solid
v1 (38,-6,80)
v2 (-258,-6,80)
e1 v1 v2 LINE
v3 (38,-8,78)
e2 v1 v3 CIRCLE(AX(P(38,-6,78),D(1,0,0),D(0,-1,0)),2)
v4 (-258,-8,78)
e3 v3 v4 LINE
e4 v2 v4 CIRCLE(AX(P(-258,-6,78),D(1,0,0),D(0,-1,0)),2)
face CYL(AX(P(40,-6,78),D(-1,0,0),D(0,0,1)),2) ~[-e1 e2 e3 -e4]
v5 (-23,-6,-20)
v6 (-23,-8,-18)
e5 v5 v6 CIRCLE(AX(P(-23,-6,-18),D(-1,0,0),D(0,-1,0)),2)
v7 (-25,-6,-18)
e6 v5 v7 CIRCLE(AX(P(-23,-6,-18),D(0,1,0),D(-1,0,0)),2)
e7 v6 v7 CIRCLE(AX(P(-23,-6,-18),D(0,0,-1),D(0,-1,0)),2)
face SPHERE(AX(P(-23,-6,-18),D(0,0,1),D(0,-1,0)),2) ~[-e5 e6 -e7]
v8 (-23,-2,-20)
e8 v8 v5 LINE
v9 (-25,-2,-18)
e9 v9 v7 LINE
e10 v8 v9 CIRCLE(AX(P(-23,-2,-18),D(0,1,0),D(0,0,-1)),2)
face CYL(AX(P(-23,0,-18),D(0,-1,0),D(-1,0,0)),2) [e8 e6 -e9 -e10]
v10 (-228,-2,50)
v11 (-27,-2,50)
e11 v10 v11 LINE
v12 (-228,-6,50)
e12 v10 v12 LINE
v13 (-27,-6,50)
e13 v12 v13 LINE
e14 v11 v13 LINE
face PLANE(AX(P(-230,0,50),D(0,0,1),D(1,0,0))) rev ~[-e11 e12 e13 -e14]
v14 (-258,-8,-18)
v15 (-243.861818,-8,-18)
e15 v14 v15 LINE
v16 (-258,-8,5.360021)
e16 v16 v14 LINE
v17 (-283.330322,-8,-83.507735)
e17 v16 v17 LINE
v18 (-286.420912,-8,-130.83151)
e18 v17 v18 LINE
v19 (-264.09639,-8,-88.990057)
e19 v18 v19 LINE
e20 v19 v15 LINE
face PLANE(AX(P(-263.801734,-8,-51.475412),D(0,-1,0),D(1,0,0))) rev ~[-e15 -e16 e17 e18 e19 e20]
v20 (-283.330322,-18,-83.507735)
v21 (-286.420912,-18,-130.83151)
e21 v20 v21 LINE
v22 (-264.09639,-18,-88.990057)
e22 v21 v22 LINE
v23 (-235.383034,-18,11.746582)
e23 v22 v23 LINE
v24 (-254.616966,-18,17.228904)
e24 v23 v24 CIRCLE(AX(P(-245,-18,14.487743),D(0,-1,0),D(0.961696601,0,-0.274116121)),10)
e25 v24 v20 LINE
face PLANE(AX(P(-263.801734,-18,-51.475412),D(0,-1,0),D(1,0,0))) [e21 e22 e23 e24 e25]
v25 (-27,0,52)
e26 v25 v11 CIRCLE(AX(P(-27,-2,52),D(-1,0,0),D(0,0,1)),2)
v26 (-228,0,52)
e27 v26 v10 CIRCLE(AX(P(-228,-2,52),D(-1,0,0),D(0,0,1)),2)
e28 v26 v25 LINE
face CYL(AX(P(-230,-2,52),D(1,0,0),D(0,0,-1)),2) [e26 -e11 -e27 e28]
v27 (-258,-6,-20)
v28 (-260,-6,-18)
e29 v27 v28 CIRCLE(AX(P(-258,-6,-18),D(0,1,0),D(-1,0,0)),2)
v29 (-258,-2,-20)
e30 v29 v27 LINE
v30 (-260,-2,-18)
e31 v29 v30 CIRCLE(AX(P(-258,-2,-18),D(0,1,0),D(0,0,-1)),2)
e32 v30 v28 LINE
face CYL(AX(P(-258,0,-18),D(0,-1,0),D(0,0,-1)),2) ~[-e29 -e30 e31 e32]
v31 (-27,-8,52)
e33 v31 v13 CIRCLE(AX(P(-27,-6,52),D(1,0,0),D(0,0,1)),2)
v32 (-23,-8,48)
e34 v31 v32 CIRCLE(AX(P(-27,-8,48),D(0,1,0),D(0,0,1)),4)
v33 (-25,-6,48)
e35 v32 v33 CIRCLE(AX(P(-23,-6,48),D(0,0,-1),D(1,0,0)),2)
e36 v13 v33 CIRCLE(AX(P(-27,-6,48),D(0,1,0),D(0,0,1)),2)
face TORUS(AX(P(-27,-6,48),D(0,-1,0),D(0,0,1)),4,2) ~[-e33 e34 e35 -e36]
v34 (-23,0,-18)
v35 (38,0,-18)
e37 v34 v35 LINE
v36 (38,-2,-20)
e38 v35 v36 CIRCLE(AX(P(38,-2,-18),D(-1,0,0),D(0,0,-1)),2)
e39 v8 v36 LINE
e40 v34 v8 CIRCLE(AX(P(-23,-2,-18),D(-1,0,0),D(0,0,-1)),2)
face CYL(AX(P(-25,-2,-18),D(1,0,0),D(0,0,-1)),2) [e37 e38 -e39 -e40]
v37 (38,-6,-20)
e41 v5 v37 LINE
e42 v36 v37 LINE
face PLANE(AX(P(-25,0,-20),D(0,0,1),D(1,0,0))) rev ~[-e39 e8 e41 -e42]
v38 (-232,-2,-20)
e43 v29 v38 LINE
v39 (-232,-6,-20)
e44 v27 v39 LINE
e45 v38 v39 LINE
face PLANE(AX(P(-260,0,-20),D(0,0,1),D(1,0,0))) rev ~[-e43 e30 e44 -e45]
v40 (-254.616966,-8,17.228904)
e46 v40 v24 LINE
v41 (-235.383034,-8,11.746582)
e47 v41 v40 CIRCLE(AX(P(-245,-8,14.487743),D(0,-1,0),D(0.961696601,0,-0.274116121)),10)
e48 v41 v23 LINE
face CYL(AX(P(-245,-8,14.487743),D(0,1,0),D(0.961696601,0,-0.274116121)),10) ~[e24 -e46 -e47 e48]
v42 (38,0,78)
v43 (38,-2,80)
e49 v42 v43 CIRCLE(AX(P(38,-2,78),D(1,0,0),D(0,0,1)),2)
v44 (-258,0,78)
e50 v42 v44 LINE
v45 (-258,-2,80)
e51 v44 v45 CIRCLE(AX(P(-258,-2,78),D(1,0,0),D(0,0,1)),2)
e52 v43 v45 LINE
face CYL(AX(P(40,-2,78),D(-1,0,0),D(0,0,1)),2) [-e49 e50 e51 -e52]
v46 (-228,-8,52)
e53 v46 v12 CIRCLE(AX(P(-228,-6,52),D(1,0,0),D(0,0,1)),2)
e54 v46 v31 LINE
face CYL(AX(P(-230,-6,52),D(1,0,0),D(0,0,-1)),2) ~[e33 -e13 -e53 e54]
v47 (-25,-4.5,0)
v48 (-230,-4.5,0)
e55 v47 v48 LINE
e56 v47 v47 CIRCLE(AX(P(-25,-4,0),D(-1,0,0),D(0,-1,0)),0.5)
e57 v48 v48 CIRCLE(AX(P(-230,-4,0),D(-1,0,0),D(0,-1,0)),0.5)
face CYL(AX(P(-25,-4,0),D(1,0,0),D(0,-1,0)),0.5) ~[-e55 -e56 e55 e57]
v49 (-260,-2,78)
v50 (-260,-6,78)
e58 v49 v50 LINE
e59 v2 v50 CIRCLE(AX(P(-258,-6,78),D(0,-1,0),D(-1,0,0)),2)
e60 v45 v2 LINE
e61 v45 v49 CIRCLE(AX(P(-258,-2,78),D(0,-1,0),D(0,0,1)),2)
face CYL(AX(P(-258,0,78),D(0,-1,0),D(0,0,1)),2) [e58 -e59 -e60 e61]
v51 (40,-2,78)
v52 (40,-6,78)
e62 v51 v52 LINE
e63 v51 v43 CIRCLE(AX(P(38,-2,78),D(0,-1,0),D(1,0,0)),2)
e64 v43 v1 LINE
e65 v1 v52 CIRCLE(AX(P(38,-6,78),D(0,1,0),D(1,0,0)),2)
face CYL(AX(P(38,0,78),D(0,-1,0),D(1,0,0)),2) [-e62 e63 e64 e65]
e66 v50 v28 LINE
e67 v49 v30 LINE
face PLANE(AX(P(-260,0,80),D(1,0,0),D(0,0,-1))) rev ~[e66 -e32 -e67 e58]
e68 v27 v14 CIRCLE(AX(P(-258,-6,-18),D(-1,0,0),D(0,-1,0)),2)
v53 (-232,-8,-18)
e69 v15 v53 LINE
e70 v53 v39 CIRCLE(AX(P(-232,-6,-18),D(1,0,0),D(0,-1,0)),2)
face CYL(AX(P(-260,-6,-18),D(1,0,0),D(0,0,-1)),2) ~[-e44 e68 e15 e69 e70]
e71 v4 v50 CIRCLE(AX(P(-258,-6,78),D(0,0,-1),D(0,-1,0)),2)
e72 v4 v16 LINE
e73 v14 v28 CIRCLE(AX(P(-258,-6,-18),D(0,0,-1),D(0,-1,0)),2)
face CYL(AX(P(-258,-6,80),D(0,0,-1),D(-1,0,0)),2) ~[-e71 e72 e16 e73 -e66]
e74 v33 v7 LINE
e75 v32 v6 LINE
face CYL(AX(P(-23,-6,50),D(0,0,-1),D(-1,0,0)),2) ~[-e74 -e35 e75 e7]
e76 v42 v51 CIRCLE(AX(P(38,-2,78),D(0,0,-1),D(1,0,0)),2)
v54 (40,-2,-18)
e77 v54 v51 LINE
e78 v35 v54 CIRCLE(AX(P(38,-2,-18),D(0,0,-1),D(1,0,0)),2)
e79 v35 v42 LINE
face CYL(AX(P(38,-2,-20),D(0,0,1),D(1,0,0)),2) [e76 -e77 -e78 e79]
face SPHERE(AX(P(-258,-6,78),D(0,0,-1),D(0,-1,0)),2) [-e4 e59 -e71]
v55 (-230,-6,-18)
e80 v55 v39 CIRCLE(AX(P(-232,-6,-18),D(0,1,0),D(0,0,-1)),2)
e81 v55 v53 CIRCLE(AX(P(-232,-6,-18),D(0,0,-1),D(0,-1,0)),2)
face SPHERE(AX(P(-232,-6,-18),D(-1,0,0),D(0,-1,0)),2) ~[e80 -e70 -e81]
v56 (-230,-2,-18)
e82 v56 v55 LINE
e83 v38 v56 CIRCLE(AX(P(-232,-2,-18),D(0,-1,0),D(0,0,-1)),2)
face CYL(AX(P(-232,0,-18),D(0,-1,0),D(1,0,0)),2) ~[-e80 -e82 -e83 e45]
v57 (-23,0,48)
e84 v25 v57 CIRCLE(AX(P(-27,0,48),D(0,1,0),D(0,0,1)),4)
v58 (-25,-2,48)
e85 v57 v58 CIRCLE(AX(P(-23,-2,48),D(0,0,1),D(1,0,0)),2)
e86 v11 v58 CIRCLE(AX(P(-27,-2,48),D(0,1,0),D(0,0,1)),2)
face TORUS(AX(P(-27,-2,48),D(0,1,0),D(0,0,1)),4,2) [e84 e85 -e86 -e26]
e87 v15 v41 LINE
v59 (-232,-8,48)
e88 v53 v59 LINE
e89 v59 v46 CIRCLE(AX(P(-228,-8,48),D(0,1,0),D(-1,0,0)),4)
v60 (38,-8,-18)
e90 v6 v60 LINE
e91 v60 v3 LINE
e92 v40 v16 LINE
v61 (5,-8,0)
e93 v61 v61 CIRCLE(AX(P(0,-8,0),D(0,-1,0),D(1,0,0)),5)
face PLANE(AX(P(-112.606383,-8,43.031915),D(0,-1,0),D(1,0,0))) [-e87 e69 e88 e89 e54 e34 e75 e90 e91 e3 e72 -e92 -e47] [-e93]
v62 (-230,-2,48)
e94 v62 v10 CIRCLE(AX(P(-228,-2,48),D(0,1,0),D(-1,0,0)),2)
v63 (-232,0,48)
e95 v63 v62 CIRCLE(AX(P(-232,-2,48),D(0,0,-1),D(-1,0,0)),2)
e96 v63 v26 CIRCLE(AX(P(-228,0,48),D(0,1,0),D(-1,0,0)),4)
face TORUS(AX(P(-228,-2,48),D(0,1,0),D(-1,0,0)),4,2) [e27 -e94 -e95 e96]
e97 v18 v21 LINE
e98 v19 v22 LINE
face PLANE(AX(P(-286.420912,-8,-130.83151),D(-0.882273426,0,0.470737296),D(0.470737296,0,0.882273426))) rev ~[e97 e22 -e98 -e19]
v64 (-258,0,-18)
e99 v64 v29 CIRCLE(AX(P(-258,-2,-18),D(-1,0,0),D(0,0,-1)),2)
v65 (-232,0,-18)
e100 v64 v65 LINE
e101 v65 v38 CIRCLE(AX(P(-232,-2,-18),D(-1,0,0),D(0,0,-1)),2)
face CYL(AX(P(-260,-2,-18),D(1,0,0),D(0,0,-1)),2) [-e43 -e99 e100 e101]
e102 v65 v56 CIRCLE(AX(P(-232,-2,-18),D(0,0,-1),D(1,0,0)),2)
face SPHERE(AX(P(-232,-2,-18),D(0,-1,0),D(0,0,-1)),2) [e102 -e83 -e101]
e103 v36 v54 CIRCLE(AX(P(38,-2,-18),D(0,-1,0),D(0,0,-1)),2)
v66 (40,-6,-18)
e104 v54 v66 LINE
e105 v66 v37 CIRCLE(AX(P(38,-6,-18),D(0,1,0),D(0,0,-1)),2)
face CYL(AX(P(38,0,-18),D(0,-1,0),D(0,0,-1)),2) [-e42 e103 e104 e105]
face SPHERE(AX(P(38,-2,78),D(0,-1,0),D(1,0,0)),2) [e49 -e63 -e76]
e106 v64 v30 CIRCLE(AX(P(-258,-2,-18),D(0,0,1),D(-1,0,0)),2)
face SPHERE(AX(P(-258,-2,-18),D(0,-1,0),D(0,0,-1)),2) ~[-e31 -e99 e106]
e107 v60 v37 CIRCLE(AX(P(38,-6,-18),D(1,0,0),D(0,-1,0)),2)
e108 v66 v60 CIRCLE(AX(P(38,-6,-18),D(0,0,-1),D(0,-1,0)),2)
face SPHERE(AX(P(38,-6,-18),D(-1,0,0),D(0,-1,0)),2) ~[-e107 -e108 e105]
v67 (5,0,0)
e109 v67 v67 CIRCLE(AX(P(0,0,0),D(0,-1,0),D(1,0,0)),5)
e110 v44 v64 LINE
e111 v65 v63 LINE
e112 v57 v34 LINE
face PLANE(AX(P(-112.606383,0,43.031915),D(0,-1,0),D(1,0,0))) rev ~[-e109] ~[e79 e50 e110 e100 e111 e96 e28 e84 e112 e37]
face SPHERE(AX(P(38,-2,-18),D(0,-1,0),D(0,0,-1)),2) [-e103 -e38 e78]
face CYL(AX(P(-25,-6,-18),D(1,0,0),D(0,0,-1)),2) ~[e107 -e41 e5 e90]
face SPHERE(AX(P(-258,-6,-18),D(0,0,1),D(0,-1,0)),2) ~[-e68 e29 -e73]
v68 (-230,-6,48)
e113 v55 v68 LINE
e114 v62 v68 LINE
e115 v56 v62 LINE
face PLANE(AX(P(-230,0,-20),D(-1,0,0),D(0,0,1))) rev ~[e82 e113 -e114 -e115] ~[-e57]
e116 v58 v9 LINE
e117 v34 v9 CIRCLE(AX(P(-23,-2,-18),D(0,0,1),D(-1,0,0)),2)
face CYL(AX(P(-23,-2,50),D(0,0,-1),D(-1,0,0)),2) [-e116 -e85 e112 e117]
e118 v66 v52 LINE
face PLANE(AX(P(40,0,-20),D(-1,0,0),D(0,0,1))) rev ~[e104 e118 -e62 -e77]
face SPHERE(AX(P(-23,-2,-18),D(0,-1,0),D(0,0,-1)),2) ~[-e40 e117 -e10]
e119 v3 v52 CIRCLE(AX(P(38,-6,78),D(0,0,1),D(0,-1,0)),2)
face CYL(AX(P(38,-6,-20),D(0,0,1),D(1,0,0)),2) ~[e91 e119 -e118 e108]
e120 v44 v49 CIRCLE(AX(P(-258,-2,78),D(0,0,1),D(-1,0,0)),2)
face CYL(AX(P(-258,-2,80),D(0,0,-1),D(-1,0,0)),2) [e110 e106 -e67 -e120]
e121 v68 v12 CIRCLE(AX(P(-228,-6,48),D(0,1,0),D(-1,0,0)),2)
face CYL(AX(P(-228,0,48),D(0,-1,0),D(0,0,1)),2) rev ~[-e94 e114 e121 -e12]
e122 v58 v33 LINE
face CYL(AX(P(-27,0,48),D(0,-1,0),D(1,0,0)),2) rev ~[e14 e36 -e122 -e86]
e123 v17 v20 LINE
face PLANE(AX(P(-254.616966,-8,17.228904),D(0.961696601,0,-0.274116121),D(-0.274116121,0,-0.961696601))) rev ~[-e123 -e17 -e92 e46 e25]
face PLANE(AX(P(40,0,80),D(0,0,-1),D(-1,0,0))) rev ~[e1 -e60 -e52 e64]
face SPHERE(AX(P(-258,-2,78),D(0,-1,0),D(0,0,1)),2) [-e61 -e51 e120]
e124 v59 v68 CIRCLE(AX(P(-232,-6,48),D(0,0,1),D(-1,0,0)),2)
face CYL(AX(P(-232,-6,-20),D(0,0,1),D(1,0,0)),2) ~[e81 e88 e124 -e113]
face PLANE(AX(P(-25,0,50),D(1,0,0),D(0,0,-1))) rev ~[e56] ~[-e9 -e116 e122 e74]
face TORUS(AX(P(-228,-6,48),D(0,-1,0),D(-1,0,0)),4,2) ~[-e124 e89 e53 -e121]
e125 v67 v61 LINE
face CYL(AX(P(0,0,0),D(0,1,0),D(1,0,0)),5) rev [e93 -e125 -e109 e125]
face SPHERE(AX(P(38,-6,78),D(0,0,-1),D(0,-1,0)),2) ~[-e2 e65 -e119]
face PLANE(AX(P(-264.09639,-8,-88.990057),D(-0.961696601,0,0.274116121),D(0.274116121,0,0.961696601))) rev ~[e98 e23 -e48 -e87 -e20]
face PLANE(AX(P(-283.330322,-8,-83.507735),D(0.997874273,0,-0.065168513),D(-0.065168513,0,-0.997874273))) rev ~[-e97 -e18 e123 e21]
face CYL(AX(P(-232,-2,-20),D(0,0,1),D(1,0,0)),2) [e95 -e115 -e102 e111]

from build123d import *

# Parameters (mm, degrees)
F0_R     = 5
F1_DEPTH = 8
F2_R     = 2
F3_R     = 0.5
F4_DEPTH = 205
F6_DEPTH = 10


with BuildPart() as f1:
    # F0 (on Front) → F1 (new body)
    with BuildSketch(Plane.XZ):
        Polygon((-25, 50), (-25, -20), (40, -20), (40, 80), (-260, 80), (-260, -20), (-230, -20), (-230, 50), align=None)
        Circle(F0_R, mode=Mode.SUBTRACT)
    extrude(amount=F1_DEPTH)

    # F2
    f2_edges = [f1.edges().sort_by_distance(p)[0] for p in [
        (-260, -8, 30),
        (-245, -8, -20),
        (-230, -8, 15),
        (-127.5, -8, 50),
        (-25, -8, 15),
        (7.5, -8, -20),
        (40, -8, 30),
        (-110, -8, 80),
        (-260, -4, 80),
        (-260, -4, -20),
        (40, -4, 80),
        (40, -4, -20),
        (-25, -4, -20),
        (-25, -4, 50),
        (-230, -4, 50),
        (-230, -4, -20),
        (-245, 0, -20),
        (-230, 0, 15),
        (-127.5, 0, 50),
        (7.5, 0, -20),
        (40, 0, 30),
        (-110, 0, 80),
        (-260, 0, 30),
        (-25, 0, 15),
    ]]
    fillet(f2_edges, radius=F2_R)

    # F3 (on face) → F4 (join, through all)
    with BuildSketch(Plane(origin=(-25, 0, 0), x_dir=(0, -1, 0), z_dir=(-1, 0, 0))):
        with Locations((4, 0)):
            Circle(F3_R)
    extrude(amount=F4_DEPTH)

    # F5 (on face) → F6 (join)
    with BuildSketch(Plane.XZ.offset(8)):
        with BuildLine():
            ThreePointArc((-235.3830339919, 11.7465816491), (-242.2588387865, 24.1047088707), (-254.6169660081, 17.2289040761))
            Line((-254.6169660081, 17.2289040761), (-283.3303219183, -83.5077349835))
            Line((-283.3303219183, -83.5077349835), (-286.420911747, -130.8315102833))
            Line((-286.420911747, -130.8315102833), (-264.096389902, -88.9900574105))
            Line((-264.096389902, -88.9900574105), (-235.3830339919, 11.7465816491))
        make_face()
    extrude(amount=F6_DEPTH)


solid = f1.part
